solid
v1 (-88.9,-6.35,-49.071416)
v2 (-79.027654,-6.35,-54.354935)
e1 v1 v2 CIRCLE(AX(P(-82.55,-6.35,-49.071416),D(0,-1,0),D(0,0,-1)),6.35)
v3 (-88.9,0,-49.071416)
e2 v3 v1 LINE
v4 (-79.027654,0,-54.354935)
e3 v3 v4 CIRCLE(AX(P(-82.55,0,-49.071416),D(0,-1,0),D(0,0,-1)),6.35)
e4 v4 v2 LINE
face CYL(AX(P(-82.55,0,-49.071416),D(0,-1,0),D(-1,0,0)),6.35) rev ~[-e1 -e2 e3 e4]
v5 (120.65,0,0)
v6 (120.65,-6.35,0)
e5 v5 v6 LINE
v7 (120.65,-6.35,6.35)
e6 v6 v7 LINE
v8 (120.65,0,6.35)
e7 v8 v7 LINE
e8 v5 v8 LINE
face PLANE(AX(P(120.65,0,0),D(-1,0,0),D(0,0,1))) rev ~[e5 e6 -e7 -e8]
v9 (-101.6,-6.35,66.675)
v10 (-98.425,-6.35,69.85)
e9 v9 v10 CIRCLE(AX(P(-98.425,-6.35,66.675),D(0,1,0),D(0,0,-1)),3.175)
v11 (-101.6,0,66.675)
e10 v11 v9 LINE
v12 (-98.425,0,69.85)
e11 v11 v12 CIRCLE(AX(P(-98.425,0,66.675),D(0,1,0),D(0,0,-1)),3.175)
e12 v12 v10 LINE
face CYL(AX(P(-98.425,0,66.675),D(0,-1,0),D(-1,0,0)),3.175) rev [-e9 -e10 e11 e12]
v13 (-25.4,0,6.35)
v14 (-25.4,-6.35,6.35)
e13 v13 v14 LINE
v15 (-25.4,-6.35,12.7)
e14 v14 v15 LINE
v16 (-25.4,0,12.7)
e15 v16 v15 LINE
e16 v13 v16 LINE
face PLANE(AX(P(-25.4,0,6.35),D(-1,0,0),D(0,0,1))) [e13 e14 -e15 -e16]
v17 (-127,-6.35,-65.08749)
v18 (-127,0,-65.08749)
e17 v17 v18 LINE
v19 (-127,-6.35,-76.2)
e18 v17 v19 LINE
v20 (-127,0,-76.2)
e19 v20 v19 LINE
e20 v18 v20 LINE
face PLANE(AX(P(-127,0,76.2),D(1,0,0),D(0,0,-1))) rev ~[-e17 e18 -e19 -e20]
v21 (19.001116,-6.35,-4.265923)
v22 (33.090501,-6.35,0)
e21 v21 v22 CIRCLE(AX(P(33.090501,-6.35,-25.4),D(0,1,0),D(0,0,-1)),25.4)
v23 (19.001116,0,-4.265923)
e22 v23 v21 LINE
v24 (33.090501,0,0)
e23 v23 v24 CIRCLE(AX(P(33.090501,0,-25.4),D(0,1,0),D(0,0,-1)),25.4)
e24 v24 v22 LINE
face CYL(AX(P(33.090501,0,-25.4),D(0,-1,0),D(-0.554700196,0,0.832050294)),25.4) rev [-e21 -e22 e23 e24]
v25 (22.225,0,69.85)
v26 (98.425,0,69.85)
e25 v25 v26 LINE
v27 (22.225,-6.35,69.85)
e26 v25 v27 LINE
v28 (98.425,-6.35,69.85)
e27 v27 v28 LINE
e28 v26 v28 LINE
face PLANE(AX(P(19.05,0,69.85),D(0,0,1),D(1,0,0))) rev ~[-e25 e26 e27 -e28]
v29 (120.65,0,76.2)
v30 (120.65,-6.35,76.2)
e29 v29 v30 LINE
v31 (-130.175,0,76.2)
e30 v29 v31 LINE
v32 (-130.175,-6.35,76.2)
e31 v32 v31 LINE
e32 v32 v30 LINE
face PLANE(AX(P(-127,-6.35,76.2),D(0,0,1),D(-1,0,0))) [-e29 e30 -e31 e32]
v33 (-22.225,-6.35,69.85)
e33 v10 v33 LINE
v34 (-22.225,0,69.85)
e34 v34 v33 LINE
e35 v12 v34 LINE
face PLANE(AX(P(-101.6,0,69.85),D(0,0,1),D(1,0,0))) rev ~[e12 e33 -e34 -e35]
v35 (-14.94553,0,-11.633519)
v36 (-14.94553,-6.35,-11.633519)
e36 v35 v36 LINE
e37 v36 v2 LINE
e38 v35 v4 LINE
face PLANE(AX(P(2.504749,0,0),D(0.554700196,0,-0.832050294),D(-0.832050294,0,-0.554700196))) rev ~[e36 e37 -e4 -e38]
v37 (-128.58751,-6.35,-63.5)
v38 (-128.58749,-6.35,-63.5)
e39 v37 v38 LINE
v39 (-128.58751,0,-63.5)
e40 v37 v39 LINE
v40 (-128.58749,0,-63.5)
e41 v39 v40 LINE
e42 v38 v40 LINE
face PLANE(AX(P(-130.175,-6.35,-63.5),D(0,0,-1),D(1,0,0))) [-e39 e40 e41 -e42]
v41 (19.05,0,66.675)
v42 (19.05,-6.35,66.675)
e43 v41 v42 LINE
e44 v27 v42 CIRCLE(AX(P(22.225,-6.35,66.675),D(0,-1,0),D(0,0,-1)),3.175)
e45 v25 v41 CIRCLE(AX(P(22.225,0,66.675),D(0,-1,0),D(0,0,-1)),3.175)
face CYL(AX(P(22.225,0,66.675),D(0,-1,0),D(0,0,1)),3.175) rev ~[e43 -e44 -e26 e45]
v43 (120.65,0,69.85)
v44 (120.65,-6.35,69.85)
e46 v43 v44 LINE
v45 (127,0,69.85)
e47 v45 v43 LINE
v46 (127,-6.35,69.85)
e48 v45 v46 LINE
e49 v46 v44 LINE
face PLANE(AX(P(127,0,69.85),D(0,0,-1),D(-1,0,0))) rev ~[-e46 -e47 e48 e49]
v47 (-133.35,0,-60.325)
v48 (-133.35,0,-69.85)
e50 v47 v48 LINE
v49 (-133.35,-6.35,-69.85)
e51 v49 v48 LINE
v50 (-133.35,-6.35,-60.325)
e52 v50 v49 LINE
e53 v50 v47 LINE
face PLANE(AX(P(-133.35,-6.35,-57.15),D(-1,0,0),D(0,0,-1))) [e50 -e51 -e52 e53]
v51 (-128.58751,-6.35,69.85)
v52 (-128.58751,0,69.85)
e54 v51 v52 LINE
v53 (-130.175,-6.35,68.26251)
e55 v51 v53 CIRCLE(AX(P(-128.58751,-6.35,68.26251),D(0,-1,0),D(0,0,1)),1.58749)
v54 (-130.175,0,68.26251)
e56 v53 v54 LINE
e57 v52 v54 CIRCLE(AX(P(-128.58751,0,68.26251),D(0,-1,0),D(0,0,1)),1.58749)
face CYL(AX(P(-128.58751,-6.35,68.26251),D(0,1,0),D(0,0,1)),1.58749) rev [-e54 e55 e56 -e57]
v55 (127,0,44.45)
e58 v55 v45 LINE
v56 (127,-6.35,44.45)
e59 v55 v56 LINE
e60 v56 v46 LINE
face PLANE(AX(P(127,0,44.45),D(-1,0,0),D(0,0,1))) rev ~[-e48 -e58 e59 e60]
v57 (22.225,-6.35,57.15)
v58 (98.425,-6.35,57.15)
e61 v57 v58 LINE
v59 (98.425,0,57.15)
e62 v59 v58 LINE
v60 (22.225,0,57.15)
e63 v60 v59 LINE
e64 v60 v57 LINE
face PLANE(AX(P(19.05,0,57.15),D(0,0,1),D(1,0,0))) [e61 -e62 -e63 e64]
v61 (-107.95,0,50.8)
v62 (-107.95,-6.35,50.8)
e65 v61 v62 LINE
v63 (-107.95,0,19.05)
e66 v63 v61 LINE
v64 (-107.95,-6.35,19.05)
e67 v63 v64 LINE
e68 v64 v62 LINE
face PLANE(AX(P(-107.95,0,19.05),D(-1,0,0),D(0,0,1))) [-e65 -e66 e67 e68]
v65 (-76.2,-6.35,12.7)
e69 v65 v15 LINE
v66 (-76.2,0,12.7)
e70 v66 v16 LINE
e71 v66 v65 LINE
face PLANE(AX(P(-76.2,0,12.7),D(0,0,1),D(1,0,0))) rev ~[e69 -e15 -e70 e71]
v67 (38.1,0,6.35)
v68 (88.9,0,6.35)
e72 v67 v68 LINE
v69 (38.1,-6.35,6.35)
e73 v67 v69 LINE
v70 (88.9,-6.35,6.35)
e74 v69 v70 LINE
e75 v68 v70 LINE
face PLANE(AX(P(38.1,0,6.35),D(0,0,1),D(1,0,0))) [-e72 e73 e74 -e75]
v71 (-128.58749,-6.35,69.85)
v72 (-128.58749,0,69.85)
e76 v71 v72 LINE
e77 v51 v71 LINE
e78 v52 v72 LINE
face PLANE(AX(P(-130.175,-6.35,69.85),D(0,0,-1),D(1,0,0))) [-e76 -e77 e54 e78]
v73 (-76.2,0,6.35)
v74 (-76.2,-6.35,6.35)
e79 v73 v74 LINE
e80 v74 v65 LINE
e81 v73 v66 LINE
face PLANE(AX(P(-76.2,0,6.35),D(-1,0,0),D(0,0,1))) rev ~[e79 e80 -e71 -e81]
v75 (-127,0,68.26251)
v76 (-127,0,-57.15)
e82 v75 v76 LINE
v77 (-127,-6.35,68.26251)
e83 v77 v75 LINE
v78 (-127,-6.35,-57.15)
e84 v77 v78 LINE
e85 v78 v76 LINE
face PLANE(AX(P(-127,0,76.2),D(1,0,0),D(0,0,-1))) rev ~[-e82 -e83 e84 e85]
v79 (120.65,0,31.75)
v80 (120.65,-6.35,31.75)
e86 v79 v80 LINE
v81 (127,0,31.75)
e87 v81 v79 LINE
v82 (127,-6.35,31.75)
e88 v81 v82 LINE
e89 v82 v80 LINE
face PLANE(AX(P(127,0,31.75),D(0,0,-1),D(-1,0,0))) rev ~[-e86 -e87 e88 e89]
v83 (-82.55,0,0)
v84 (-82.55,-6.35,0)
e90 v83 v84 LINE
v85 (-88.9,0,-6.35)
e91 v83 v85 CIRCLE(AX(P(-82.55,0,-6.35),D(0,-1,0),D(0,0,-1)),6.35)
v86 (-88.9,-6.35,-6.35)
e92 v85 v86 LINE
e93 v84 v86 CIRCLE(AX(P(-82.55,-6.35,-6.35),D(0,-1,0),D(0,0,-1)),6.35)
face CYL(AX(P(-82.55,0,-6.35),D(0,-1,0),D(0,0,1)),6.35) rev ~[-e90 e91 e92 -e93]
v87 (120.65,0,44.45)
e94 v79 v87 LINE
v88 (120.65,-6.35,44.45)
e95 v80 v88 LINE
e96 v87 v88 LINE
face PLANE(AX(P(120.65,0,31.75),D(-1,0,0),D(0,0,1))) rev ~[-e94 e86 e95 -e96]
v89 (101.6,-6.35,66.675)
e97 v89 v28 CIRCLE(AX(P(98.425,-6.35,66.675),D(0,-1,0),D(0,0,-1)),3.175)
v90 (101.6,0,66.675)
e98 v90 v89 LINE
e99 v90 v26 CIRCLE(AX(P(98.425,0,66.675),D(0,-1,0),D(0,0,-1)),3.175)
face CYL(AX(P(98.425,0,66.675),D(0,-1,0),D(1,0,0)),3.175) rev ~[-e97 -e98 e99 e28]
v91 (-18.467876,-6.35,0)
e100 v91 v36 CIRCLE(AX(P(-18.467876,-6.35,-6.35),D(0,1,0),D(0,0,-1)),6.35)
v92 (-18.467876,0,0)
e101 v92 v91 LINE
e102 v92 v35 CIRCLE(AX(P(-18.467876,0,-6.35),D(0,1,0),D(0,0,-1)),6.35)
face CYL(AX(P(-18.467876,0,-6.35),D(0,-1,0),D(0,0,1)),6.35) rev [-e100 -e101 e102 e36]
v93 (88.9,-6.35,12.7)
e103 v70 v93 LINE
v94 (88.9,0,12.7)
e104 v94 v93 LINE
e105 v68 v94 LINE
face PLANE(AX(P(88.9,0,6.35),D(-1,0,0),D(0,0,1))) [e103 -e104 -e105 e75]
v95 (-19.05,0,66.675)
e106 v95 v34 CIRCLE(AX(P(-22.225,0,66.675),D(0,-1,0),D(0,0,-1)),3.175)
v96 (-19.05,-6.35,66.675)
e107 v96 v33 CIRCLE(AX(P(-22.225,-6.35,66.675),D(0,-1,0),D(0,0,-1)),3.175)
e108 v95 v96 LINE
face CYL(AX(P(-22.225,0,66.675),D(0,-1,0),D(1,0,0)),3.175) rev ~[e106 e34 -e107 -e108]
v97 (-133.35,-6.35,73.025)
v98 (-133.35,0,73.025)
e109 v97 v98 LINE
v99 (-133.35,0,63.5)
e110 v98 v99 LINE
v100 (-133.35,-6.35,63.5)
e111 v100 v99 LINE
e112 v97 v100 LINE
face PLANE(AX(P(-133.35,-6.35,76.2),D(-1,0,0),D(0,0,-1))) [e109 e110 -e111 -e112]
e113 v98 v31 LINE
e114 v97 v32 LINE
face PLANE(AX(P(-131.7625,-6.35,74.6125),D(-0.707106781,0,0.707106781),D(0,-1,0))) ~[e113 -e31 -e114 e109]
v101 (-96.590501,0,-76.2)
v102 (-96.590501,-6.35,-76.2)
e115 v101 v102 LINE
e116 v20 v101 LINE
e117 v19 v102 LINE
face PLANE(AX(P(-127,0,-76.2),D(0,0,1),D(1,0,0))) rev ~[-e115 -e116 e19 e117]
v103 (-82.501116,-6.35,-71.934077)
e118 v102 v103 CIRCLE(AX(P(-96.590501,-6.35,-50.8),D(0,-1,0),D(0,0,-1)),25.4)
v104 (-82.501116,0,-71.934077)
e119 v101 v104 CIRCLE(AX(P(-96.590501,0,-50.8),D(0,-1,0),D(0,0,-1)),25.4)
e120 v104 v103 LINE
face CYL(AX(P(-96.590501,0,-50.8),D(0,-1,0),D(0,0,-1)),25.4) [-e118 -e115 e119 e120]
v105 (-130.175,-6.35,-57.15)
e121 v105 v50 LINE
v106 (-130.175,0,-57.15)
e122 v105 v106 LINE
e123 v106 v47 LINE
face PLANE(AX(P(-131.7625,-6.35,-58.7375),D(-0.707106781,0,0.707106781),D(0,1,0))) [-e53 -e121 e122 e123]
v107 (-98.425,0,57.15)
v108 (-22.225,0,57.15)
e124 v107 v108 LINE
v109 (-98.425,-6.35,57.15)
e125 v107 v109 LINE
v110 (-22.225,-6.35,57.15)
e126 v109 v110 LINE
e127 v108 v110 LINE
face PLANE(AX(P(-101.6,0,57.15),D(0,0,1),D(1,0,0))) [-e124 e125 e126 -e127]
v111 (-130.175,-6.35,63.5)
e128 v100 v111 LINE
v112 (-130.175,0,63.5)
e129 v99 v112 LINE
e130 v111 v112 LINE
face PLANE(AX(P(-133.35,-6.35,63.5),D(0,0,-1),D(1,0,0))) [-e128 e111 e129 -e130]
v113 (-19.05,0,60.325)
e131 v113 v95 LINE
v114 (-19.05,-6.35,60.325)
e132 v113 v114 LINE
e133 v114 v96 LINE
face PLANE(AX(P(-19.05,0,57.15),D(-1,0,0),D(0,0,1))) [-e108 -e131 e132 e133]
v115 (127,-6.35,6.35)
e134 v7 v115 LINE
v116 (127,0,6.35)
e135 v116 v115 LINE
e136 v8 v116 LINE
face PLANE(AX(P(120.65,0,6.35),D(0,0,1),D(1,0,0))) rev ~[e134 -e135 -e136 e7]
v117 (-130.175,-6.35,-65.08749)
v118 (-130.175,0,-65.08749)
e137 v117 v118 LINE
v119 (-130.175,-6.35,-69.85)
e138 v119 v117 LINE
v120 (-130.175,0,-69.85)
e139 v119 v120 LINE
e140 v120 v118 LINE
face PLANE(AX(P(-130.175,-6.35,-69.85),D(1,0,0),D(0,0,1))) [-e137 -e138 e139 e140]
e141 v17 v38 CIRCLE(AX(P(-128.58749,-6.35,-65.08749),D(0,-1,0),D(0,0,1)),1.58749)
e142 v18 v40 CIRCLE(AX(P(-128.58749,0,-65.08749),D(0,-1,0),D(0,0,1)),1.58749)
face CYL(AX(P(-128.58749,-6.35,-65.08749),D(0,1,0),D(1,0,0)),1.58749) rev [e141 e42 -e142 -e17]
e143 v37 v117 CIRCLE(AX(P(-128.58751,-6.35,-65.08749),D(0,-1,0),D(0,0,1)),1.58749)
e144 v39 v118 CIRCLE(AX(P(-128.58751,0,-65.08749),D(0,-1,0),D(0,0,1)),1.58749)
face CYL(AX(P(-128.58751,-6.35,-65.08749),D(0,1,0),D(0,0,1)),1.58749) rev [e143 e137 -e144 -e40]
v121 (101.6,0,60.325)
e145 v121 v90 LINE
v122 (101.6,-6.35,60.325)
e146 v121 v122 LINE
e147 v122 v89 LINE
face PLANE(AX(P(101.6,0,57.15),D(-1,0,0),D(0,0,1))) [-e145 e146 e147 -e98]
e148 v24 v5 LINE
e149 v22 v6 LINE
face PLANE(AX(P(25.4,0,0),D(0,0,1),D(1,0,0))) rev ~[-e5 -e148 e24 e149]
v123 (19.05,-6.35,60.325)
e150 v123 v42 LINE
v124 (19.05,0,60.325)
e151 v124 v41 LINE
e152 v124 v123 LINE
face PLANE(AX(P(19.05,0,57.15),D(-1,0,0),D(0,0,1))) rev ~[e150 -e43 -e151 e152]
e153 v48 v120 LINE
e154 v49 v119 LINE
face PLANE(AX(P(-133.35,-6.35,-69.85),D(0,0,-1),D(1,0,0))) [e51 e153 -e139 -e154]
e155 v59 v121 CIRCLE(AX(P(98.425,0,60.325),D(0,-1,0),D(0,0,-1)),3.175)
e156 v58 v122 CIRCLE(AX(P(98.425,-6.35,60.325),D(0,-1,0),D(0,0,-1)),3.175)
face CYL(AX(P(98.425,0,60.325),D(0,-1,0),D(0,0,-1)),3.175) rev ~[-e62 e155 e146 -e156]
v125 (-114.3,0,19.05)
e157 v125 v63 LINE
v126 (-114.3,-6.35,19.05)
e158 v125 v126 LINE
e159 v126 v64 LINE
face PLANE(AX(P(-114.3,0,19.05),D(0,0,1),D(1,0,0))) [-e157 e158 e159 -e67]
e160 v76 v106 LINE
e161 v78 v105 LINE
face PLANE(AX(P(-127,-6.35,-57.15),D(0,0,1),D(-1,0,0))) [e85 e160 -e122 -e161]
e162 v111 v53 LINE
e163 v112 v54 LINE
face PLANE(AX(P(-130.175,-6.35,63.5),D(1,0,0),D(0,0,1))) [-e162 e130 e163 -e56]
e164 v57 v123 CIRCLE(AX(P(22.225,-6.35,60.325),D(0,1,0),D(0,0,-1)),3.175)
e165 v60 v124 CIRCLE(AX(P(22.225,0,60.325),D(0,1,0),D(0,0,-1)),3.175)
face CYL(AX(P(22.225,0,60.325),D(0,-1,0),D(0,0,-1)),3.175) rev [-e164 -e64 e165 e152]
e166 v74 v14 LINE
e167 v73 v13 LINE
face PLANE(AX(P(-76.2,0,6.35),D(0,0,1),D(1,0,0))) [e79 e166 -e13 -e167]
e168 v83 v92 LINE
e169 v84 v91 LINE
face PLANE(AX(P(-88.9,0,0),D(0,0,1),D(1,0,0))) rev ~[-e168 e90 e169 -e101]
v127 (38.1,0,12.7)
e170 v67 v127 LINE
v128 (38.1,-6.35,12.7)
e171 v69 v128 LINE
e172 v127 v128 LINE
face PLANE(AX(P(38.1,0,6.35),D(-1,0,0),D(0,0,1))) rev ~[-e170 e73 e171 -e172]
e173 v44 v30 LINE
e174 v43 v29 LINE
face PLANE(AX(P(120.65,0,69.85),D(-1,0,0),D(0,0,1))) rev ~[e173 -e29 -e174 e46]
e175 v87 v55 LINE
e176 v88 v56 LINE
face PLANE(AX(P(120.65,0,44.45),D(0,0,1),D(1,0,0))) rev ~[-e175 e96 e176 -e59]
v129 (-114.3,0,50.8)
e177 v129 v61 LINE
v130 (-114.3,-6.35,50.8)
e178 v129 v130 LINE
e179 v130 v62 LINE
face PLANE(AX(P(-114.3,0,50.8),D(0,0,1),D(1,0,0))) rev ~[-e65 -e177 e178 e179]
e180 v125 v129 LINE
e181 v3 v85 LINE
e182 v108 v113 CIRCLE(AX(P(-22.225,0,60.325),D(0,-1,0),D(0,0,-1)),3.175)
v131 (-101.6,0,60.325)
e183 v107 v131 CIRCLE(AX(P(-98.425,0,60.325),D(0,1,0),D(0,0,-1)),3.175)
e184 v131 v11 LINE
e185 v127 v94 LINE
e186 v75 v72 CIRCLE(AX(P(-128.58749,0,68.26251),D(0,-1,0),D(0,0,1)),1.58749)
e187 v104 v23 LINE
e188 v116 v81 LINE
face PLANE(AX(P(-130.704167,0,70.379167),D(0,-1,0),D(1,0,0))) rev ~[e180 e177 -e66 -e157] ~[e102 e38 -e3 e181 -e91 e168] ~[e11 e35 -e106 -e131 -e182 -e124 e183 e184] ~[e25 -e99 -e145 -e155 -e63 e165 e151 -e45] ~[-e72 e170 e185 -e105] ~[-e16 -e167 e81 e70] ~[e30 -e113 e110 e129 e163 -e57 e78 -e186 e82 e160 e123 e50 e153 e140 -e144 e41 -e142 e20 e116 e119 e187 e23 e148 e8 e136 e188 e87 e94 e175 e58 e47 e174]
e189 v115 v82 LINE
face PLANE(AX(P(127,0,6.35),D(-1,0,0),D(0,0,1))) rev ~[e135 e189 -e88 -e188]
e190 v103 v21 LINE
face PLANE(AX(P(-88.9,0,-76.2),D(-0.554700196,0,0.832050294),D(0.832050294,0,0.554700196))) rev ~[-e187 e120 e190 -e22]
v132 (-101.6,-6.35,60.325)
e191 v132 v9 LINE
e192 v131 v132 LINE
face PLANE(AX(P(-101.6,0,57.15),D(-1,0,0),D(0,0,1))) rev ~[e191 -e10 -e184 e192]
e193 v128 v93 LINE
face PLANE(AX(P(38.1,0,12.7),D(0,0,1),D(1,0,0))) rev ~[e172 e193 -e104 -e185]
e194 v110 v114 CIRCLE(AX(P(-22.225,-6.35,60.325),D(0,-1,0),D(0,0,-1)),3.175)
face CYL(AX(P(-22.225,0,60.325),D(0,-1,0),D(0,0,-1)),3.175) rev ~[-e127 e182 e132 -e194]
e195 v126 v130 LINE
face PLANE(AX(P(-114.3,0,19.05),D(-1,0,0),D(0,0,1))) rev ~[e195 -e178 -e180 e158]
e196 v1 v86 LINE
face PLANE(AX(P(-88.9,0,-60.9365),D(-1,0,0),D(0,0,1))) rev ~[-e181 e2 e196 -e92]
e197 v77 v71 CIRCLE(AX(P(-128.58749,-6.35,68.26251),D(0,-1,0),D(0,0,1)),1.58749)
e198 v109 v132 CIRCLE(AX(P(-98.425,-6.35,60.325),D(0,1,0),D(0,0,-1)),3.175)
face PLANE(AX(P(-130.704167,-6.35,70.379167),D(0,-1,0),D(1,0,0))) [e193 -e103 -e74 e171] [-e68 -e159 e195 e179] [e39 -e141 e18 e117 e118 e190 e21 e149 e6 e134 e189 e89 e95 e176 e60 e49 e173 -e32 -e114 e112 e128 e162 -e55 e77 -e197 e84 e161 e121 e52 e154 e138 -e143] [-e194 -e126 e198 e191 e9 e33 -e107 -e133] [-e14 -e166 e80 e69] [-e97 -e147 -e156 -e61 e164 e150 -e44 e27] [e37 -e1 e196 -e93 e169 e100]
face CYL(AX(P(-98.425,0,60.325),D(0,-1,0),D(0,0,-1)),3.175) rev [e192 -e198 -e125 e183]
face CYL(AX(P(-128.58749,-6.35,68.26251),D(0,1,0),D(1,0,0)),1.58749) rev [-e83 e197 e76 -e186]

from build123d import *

# Parameters (mm, degrees)
F0_W     = 6.35
F0_H     = 31.75
F0_W_2   = 50.8
F0_H_2   = 6.35
F0_W_3   = 82.55
F0_H_3   = 12.7
F1_DEPTH = 6.35
F2_R     = 6.35
F3_R     = 25.4
F4_R     = 3.175
F6_DEPTH = 6.35
F7_R     = 1.58749
F8_SIZE  = 3.175


# Not quite as in the source:
# - a fillet or chamfer is up to 0.001 mm smaller than in the source, because OpenCascade refuses the exact size


with BuildPart() as f1:
    # F0 (on Front) → F1 (new body)
    with BuildSketch(Plane.XZ):
        Polygon((120.65, 76.2), (-127, 76.2), (-127, -76.2), (-88.9, -76.2), (25.4, 0), (120.65, 0), (120.65, 6.35), (127, 6.35), (127, 31.75), (120.65, 31.75), (120.65, 44.45), (127, 44.45), (127, 69.85), (120.65, 69.85), align=None)
        Polygon((2.5047494008, 0), (-88.9, -60.9364996005), (-88.9, 0), align=None, mode=Mode.SUBTRACT)
        with Locations((-111.125, 34.925)):
            Rectangle(F0_W, F0_H, mode=Mode.SUBTRACT)
        with Locations((-50.8, 9.525)):
            Rectangle(F0_W_2, F0_H_2, mode=Mode.SUBTRACT)
        with Locations((-60.325, 63.5)):
            Rectangle(F0_W_3, F0_H_3, mode=Mode.SUBTRACT)
        with Locations((63.5, 9.525)):
            Rectangle(F0_W_2, F0_H_2, mode=Mode.SUBTRACT)
        with Locations((60.325, 63.5)):
            Rectangle(F0_W_3, F0_H_3, mode=Mode.SUBTRACT)
    extrude(amount=F1_DEPTH)

    # F2
    f2_edges = [f1.edges().sort_by_distance(p)[0] for p in [
        (2.504749, -3.175, 0),
        (-88.9, -3.175, -60.9365),
        (-88.9, -3.175, 0),
    ]]
    fillet(f2_edges, radius=F2_R)

    # F3
    f3_edges = [f1.edges().sort_by_distance(p)[0] for p in [
        (25.4, -3.175, 0),
        (-88.9, -3.175, -76.2),
    ]]
    fillet(f3_edges, radius=F3_R)

    # F4
    f4_edges = [f1.edges().sort_by_distance(p)[0] for p in [
        (-101.6, -3.175, 57.15),
        (-101.6, -3.175, 69.85),
        (-19.05, -3.175, 57.15),
        (-19.05, -3.175, 69.85),
        (101.6, -3.175, 69.85),
        (101.6, -3.175, 57.15),
        (19.05, -3.175, 57.15),
        (19.05, -3.175, 69.85),
    ]]
    fillet(f4_edges, radius=F4_R)

    # F5 (on face) → F6 (join)
    with BuildSketch(Plane.XZ.offset(6.35)):
        Polygon((-127, 69.85), (-127, 76.2), (-133.35, 76.2), (-133.35, 63.5), (-130.175, 63.5), (-130.175, 69.85), align=None)
        Polygon((-130.175, -63.5), (-127, -63.5), (-127, -57.15), (-133.35, -57.15), (-133.35, -69.85), (-130.175, -69.85), align=None)
        Polygon((-127, -63.5), (-127, -57.15), (-133.35, -57.15), (-133.35, -69.85), (-130.175, -69.85), (-130.175, -63.5), align=None)
    extrude(amount=-F6_DEPTH)

    # F7 (radius 1.5875 in the source; OpenCascade refuses exactly that, so slightly less here)
    f7_edges = [f1.edges().sort_by_distance(p)[0] for p in [
        (-127, -3.175, 69.85),
        (-130.175, -3.175, 69.85),
        (-130.175, -3.175, -63.5),
        (-127, -3.175, -63.5),
    ]]
    fillet(f7_edges, radius=F7_R)

    # F8
    f8_edges = [f1.edges().sort_by_distance(p)[0] for p in [
        (-133.35, -3.175, 76.2),
        (-133.35, -3.175, -57.15),
    ]]
    chamfer(f8_edges, length=F8_SIZE)


solid = f1.part
